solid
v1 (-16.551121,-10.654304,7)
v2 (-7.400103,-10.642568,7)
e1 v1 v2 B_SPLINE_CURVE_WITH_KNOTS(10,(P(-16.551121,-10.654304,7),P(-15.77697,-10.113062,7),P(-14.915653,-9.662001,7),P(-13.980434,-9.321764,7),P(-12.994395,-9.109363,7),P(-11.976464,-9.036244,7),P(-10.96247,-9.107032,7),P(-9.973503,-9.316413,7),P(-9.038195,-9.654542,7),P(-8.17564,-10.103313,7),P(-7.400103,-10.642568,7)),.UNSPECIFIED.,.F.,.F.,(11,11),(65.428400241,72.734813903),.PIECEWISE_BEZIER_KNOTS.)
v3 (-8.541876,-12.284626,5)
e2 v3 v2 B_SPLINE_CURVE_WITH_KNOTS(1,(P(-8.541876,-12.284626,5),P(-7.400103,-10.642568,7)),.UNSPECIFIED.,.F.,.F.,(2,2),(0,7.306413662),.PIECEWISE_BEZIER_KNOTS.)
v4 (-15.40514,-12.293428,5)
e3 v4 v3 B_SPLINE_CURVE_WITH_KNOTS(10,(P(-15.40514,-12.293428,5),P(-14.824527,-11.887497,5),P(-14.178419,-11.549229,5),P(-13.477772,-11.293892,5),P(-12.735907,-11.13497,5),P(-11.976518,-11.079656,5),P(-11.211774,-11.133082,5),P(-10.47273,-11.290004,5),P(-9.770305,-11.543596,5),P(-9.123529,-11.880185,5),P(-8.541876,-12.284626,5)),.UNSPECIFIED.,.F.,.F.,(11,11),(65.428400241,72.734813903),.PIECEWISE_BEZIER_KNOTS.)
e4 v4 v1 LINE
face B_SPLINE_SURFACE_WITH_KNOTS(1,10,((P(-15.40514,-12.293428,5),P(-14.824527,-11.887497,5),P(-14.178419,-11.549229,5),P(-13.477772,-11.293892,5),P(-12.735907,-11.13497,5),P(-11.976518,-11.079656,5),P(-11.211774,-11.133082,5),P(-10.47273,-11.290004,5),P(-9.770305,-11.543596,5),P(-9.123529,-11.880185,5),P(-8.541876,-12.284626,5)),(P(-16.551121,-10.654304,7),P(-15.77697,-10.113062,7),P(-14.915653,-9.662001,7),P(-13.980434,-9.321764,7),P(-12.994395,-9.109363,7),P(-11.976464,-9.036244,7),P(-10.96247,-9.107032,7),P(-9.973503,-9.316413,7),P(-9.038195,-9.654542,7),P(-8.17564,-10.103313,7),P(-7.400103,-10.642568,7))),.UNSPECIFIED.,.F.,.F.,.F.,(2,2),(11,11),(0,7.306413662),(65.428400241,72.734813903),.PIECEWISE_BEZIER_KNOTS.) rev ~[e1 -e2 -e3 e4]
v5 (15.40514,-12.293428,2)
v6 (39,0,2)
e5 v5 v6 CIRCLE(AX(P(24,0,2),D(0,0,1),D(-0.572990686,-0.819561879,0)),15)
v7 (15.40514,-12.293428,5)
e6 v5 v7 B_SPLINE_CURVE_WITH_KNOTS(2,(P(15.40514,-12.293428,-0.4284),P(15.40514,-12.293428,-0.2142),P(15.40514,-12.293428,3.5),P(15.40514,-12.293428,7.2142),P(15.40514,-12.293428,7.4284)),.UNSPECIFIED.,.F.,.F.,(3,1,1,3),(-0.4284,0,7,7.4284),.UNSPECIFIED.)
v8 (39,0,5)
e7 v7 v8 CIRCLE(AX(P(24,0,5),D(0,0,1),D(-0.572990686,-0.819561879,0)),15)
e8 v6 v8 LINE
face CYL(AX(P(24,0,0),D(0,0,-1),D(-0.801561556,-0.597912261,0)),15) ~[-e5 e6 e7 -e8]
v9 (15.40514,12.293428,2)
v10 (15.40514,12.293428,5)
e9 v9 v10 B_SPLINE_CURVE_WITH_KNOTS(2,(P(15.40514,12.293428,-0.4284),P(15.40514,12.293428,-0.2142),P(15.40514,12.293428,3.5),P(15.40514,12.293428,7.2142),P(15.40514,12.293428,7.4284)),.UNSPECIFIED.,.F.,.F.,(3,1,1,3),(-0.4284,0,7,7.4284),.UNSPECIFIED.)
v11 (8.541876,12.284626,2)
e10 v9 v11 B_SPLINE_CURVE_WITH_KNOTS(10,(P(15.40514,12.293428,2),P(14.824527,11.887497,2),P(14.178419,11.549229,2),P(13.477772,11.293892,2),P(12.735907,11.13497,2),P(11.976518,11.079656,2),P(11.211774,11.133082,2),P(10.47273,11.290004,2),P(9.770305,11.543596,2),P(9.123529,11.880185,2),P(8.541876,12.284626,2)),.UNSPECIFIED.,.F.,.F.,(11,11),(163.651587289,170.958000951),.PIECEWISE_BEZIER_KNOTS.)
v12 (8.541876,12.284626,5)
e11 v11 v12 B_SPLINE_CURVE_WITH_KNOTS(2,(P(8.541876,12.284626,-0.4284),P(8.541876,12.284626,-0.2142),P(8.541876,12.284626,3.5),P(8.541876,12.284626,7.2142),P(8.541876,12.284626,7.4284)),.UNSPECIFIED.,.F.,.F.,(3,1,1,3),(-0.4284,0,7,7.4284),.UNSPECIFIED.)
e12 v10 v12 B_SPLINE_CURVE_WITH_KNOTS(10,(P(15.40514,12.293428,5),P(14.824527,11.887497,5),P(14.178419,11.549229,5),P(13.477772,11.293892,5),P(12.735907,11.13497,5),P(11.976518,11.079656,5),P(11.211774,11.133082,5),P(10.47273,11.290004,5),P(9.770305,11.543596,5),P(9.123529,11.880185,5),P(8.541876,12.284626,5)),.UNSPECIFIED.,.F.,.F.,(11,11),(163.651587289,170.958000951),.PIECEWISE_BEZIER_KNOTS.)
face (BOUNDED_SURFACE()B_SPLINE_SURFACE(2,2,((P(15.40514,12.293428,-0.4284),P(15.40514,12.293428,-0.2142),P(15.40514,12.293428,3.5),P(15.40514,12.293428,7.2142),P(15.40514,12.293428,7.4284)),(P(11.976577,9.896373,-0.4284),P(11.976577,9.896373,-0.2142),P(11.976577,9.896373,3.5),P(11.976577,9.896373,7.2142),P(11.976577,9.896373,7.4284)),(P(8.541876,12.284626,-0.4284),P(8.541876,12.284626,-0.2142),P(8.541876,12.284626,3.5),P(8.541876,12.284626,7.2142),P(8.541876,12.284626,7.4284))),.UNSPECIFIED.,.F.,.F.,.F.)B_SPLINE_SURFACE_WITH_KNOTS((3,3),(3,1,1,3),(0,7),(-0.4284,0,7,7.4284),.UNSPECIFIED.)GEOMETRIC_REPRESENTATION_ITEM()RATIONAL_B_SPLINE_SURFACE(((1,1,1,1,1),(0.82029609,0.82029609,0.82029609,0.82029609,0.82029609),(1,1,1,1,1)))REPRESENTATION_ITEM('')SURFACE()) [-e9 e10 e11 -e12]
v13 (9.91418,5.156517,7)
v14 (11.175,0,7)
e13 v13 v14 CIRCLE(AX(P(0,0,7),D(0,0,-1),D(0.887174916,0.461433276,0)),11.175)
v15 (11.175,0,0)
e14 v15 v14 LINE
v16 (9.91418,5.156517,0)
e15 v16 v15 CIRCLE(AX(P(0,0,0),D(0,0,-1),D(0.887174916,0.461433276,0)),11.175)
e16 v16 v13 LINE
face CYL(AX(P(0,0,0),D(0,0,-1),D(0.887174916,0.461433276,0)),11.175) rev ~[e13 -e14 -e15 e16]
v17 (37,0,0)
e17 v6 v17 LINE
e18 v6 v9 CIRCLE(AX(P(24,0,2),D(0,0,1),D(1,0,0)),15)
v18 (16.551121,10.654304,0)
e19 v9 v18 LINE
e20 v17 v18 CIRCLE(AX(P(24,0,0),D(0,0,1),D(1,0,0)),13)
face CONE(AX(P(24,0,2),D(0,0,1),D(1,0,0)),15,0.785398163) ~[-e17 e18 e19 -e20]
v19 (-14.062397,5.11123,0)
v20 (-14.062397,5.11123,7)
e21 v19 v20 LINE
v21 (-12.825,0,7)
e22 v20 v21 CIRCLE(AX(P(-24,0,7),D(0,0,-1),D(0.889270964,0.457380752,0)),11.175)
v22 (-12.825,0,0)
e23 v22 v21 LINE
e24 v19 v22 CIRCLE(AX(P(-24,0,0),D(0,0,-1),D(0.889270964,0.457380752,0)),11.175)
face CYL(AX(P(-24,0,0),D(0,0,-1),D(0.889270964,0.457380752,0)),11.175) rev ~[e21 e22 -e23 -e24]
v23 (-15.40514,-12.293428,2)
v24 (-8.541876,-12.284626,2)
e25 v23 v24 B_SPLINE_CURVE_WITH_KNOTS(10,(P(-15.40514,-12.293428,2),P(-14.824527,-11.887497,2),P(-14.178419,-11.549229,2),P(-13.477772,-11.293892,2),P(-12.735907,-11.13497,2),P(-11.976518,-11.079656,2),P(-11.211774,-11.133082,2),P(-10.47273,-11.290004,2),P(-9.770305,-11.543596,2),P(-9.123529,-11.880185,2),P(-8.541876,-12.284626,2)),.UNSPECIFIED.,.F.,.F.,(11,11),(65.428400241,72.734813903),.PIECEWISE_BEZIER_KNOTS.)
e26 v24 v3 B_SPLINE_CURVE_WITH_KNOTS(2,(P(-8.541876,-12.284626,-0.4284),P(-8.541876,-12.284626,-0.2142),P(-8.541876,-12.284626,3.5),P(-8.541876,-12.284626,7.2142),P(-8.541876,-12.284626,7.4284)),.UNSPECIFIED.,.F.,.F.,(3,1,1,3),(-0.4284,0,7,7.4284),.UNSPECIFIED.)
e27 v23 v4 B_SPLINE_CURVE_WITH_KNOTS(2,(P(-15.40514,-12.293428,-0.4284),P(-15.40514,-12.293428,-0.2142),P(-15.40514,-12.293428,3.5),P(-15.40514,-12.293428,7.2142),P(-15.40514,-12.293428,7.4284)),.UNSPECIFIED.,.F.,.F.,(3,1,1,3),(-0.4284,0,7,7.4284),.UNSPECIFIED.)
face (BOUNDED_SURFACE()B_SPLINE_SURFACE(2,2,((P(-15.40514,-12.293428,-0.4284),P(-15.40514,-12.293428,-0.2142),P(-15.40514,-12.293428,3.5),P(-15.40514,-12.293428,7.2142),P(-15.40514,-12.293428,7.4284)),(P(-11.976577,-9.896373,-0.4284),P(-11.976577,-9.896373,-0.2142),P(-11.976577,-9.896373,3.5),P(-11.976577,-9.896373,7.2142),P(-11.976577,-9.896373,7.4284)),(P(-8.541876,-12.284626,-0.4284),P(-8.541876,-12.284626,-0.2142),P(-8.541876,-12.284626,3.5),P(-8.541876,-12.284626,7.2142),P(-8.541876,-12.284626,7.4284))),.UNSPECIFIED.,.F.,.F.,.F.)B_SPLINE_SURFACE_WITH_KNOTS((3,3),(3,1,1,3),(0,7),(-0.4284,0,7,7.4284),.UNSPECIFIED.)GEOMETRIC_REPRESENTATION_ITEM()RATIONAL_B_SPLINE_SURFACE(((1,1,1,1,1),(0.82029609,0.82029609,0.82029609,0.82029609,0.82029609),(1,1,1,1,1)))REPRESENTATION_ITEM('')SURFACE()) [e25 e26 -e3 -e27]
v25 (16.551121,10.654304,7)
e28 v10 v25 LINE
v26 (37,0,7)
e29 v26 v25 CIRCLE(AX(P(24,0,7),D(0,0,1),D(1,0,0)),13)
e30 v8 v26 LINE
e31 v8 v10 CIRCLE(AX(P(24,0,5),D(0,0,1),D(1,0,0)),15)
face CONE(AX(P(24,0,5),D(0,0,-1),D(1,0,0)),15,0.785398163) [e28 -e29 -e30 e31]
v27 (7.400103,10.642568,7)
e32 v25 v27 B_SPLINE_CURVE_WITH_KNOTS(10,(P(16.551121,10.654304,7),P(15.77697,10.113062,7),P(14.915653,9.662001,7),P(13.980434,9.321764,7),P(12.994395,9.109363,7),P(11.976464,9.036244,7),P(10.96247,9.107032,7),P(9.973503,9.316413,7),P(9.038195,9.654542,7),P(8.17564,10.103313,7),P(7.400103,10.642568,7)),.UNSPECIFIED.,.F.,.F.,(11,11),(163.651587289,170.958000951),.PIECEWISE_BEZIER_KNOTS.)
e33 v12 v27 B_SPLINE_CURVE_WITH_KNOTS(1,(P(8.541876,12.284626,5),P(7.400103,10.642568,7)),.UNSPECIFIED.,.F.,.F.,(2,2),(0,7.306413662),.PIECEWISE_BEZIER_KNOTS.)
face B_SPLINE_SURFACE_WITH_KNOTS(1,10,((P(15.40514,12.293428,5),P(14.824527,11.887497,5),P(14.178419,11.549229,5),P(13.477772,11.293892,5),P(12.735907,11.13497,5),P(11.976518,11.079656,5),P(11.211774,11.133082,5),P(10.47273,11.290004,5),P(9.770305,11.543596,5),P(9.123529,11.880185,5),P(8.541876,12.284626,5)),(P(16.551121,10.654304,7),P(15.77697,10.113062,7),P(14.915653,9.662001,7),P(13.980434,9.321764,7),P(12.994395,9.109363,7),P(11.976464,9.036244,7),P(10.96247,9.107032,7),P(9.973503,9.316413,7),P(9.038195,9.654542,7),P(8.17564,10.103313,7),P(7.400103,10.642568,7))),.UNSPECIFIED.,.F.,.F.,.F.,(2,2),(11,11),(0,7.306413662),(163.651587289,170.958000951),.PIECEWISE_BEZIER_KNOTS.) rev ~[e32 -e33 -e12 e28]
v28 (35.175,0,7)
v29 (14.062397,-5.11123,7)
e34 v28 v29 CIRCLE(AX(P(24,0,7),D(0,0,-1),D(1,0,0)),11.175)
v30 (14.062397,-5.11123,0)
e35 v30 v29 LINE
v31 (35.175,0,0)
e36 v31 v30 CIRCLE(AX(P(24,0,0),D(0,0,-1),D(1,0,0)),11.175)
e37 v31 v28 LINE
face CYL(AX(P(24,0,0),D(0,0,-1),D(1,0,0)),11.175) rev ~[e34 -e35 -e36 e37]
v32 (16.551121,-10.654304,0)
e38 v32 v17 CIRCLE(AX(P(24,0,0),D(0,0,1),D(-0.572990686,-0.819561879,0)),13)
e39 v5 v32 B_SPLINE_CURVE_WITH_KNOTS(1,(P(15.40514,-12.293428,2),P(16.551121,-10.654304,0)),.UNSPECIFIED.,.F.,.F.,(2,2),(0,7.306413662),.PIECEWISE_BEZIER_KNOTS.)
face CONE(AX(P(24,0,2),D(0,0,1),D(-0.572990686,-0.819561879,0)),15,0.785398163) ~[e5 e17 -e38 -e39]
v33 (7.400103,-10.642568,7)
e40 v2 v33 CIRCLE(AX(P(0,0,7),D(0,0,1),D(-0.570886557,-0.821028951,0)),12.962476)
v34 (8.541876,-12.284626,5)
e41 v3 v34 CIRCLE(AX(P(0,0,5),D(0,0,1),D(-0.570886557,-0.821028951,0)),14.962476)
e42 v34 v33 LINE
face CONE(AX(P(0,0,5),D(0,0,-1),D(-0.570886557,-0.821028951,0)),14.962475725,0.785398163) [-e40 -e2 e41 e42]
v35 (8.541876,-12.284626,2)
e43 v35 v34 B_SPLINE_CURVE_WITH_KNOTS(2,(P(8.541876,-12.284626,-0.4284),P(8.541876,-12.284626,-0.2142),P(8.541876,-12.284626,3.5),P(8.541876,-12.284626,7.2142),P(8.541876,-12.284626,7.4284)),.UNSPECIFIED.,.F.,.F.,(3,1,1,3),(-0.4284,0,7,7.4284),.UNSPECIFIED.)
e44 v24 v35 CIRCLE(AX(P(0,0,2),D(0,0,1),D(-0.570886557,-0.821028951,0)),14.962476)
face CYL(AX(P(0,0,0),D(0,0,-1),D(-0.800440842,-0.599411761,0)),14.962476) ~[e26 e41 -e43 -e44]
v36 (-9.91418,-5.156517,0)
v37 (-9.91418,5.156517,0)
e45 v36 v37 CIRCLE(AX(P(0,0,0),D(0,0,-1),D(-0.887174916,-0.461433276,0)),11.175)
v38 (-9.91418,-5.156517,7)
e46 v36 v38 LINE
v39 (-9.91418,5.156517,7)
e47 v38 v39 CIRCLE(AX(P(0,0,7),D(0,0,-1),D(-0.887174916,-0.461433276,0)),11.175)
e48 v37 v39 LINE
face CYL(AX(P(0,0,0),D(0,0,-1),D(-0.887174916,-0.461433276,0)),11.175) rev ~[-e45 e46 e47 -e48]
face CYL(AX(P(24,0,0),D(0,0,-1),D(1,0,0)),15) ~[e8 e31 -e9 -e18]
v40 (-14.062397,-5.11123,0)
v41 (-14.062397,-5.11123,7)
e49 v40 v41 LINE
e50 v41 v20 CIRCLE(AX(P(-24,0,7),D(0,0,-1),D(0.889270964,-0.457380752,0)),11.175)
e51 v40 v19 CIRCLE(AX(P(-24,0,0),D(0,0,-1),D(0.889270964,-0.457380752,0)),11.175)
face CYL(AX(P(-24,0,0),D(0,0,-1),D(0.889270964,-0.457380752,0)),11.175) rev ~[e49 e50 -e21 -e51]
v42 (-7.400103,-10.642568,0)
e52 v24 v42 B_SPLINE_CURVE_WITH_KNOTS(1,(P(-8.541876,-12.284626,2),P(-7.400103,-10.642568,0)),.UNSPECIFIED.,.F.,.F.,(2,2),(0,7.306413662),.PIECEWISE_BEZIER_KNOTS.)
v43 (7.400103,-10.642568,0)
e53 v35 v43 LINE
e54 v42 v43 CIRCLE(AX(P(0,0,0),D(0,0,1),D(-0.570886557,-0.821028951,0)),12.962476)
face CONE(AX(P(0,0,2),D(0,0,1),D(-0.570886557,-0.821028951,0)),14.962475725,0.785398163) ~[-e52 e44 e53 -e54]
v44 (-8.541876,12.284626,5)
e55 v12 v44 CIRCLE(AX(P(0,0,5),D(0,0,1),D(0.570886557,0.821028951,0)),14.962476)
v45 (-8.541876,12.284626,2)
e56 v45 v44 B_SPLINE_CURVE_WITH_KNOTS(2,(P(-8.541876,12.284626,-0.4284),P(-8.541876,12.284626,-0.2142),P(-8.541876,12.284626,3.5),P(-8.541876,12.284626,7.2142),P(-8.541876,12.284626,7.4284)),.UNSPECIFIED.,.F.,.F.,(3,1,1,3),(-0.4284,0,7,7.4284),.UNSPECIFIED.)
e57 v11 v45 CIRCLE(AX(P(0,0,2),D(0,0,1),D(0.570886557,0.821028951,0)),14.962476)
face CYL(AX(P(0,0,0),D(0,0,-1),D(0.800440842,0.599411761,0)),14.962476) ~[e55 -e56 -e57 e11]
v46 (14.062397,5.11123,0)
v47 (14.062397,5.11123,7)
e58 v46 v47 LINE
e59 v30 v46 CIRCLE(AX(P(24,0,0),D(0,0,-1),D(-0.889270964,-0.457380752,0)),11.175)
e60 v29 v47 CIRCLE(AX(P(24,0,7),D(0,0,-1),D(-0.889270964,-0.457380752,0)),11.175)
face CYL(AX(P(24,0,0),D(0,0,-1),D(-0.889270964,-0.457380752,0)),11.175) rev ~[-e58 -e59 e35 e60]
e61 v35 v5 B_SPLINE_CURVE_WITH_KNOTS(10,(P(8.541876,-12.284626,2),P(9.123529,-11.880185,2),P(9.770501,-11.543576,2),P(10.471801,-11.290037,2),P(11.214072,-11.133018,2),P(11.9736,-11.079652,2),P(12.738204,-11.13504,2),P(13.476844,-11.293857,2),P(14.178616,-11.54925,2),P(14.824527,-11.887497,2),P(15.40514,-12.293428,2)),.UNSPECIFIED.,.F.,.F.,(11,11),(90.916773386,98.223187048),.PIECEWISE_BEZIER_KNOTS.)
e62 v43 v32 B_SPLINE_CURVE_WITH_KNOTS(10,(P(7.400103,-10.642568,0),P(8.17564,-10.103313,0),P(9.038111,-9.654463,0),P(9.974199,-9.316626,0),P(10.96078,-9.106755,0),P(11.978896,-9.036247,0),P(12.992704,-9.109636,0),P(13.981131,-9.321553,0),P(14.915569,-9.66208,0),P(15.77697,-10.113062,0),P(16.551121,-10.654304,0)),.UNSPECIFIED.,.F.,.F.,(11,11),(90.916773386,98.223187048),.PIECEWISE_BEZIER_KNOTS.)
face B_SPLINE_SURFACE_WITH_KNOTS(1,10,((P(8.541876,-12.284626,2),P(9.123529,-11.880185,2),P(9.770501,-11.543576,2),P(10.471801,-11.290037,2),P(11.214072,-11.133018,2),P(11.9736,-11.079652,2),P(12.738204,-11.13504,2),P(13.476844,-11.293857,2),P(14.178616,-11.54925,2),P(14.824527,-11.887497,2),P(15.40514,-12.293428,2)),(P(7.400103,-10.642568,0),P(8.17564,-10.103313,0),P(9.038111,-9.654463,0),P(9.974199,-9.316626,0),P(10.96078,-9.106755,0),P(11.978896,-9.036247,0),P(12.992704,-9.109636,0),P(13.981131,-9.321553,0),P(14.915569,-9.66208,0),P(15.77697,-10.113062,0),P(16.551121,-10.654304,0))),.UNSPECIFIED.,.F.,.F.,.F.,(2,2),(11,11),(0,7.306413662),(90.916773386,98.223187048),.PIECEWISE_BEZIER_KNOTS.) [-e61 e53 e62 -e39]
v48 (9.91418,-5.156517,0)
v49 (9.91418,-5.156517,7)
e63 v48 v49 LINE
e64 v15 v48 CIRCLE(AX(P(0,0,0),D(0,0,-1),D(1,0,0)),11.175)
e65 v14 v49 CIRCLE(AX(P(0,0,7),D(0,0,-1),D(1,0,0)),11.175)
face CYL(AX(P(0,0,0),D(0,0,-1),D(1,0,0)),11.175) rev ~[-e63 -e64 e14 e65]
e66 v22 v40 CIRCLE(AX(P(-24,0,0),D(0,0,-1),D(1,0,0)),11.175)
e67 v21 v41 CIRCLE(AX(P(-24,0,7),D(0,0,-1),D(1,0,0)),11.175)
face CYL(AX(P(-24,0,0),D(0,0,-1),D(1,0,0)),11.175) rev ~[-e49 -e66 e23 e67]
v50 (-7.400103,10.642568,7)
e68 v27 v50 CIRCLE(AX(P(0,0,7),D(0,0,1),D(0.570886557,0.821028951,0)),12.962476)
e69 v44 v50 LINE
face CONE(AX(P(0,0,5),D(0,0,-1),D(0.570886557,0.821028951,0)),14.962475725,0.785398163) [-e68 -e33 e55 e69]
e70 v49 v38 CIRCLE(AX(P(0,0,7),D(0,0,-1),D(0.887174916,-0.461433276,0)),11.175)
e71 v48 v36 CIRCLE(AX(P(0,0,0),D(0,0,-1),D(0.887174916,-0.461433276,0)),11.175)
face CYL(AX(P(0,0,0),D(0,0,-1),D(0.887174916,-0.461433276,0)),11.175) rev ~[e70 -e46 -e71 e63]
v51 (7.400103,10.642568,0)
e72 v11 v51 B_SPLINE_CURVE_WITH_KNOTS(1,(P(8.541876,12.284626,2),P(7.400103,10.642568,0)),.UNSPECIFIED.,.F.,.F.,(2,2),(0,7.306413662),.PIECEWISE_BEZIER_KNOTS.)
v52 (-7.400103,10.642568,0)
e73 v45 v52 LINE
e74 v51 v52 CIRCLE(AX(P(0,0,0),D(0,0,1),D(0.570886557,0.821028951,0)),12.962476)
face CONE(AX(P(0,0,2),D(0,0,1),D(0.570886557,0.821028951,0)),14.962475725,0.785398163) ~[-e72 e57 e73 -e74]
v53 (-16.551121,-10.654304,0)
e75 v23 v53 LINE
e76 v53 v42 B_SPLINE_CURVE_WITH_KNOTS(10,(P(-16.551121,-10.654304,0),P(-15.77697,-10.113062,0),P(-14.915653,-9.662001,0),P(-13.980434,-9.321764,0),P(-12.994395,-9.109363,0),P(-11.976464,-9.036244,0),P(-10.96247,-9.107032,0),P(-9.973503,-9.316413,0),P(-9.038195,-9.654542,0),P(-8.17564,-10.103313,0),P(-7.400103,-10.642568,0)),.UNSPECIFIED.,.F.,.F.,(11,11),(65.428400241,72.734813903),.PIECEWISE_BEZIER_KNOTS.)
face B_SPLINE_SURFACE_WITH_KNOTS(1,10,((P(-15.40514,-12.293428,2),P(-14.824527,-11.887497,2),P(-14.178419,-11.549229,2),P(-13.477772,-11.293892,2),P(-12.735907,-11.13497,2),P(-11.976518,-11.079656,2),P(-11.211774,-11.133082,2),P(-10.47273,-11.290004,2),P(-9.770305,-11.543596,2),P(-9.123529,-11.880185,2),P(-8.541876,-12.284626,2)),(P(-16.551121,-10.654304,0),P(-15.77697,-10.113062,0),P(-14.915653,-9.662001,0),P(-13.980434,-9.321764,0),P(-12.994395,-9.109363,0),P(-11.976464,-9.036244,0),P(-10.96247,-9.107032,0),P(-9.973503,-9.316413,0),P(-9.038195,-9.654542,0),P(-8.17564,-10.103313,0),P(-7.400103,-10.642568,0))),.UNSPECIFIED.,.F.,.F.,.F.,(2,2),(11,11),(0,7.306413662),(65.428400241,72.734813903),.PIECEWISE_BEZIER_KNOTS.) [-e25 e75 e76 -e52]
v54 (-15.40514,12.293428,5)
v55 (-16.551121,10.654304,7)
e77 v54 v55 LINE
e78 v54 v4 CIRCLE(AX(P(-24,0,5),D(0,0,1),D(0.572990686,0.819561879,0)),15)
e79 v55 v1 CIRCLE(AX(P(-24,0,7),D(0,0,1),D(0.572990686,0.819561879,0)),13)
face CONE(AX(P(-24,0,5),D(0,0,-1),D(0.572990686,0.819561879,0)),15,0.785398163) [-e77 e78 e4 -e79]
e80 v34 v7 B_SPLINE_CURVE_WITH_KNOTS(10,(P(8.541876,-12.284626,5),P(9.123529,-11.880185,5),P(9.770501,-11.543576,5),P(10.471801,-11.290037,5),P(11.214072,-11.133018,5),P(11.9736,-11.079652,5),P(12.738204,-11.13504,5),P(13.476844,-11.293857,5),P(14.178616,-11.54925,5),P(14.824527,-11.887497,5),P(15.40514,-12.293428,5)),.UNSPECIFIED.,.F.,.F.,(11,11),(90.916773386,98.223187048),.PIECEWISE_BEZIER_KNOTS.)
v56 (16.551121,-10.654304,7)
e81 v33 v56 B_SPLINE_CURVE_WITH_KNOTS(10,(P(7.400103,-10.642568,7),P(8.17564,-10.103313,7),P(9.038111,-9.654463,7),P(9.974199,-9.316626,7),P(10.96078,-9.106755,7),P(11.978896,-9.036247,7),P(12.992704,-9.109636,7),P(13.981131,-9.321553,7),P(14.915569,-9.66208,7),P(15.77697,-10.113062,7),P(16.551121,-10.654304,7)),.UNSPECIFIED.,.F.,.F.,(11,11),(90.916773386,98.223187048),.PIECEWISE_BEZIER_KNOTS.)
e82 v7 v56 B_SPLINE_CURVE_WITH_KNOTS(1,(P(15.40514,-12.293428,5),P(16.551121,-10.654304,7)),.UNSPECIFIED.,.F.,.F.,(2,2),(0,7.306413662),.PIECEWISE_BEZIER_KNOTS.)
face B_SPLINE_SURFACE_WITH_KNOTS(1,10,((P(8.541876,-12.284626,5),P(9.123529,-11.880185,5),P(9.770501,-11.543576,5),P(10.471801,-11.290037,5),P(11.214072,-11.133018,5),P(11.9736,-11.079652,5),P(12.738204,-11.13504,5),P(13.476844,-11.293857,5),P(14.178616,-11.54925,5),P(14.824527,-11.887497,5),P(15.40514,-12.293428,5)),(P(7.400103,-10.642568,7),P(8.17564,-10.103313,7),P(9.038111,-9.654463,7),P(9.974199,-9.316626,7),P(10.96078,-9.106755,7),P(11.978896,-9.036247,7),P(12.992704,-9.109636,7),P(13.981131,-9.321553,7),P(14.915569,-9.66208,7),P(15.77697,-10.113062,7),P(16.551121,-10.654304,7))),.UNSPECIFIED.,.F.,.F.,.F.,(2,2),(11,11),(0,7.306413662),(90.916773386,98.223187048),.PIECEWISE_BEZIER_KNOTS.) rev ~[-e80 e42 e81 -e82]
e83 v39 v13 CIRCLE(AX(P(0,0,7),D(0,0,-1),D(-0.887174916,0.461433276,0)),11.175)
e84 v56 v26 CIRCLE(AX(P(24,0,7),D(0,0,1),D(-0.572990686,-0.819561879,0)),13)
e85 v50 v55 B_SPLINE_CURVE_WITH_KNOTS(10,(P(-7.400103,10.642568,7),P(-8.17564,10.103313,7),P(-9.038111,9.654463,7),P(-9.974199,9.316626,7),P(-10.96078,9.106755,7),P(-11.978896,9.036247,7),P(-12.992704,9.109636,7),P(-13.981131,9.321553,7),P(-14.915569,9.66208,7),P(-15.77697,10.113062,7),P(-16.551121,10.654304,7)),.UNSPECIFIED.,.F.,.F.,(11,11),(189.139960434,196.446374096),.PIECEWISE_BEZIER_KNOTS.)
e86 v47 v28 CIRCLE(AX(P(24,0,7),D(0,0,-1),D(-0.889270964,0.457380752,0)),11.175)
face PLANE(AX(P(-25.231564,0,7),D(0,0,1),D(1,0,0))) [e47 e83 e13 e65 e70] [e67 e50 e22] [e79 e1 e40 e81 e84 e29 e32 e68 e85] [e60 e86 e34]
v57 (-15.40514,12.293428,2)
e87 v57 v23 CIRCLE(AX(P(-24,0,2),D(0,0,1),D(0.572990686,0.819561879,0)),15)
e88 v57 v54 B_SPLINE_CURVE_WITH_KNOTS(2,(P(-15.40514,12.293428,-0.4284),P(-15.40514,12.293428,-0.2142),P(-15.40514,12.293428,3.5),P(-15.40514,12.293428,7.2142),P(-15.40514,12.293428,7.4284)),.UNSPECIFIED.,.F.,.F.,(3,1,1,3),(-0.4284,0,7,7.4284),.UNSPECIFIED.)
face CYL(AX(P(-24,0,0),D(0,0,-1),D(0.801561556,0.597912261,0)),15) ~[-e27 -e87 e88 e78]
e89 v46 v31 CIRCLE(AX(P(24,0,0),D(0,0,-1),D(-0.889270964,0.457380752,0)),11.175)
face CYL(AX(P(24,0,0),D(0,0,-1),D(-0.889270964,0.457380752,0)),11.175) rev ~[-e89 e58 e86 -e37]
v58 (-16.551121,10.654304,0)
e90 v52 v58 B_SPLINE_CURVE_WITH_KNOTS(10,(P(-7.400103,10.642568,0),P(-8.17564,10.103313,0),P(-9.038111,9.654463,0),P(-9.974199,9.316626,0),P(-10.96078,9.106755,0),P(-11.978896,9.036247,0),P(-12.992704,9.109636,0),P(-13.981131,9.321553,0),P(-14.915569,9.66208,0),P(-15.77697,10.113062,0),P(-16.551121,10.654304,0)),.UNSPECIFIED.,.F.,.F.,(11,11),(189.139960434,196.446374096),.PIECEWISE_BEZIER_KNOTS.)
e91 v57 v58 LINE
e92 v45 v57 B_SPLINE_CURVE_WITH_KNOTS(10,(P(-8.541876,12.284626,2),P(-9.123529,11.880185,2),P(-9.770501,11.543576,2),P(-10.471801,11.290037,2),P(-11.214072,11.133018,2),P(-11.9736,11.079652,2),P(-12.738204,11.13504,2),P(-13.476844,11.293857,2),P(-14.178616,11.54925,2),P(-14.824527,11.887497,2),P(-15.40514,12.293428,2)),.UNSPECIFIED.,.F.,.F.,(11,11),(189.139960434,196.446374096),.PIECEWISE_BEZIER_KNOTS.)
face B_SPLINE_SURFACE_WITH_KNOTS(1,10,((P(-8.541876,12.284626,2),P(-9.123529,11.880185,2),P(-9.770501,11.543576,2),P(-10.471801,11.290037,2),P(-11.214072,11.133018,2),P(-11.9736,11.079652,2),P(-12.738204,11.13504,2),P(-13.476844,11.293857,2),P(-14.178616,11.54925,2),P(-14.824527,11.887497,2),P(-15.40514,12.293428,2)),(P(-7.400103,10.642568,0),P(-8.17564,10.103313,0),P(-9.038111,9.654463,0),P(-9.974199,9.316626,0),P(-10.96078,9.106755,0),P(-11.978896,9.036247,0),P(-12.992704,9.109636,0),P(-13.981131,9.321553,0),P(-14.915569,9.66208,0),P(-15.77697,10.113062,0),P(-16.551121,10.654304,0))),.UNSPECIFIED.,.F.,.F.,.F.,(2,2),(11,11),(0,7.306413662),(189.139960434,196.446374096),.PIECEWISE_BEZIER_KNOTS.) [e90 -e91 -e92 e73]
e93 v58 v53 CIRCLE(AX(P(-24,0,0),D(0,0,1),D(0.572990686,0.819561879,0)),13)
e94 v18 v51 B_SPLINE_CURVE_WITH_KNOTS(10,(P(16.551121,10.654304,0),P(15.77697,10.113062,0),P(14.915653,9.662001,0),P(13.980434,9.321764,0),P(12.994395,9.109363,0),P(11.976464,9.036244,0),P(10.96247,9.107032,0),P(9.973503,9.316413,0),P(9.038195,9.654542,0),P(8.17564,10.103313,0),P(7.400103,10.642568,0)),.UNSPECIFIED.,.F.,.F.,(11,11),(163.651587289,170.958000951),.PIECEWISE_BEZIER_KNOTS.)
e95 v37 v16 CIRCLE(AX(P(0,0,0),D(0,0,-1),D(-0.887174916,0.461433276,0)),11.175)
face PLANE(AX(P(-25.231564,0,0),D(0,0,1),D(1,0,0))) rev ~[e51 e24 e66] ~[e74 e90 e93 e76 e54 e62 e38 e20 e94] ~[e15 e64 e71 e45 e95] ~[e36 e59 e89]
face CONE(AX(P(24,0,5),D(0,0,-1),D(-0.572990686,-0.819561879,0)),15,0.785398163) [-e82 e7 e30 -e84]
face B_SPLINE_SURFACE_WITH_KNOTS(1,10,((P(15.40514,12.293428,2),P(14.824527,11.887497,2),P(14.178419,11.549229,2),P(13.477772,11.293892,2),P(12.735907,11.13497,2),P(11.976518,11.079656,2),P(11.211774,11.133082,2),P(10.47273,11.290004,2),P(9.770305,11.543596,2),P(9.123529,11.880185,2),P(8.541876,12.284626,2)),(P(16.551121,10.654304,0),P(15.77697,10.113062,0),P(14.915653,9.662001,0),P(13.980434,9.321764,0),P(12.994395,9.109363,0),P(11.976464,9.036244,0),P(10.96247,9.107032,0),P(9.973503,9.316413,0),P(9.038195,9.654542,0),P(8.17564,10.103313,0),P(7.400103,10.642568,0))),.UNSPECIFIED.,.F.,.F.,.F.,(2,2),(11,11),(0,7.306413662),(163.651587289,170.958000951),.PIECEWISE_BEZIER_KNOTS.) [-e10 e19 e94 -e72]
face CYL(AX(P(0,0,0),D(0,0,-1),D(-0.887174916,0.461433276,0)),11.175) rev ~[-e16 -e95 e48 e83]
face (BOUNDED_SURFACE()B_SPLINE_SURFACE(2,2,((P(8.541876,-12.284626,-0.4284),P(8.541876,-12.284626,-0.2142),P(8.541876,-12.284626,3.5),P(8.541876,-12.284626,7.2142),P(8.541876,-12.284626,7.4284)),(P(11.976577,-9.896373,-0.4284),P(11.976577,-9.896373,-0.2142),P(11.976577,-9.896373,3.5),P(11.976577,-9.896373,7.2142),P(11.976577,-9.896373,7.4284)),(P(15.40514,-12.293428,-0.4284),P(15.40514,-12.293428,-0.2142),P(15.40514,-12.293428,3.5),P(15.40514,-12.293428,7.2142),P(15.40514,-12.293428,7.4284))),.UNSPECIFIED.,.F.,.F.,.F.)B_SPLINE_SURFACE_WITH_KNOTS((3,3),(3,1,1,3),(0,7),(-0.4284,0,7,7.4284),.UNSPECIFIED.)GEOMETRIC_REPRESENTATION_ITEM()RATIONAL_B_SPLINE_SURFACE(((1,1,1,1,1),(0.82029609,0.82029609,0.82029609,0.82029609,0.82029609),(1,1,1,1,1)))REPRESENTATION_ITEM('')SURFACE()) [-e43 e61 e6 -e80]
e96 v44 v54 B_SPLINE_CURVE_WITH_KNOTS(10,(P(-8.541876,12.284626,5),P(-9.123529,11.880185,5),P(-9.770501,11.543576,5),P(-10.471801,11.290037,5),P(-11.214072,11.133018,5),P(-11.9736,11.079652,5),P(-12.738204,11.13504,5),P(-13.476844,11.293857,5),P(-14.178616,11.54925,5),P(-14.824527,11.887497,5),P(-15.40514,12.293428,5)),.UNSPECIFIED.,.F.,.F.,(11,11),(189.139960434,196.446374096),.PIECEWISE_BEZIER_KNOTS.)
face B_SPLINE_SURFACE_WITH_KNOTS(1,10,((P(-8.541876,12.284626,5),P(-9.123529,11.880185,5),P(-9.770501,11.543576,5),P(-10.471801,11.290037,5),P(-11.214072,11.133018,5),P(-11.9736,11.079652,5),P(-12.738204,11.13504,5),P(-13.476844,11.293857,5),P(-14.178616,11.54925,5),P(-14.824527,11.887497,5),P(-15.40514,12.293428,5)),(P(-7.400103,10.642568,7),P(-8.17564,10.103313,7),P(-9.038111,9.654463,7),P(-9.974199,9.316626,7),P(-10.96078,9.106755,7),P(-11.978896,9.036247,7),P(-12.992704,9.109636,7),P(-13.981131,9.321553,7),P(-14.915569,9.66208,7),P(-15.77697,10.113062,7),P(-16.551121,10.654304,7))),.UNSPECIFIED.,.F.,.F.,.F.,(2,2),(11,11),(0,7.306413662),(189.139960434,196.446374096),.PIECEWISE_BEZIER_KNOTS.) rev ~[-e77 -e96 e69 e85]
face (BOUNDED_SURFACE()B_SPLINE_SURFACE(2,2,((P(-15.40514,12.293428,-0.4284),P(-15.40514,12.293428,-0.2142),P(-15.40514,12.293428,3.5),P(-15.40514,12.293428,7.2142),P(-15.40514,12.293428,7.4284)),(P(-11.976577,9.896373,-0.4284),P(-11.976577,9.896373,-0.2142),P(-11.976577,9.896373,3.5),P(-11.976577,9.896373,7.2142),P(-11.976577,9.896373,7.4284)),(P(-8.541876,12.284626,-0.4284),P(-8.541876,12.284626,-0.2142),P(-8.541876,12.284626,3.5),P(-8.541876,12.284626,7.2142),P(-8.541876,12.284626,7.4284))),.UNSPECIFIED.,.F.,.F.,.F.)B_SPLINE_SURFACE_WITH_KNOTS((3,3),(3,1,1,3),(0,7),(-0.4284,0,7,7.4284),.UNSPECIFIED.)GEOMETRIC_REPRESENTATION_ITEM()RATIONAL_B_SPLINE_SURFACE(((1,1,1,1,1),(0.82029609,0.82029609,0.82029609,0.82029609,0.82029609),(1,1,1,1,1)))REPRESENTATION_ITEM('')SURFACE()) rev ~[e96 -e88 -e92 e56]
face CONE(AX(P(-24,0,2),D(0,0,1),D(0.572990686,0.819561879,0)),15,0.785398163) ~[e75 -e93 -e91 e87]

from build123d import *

# Parameters (mm, degrees)
F1_DEPTH = 7
F2_R     = 6
F3_SIZE  = 2


# Not quite as in the source:
# - a feature names something its author has since deleted; it is built from what else it names


with BuildPart() as f1:
    # F0 (on Top) → F1 (new body)
    with BuildSketch(Plane.XY):
        with BuildLine():
            ThreePointArc((-14.0623969756, 5.1112299037), (-13.1615738007, 7.1167868393), (-11.9765766631, 8.9686839202))
            ThreePointArc((-11.9765766631, 8.9686839202), (-39, 0), (-11.9765766631, -8.9686839202))
            ThreePointArc((-11.9765766631, -8.9686839202), (-13.1615738007, -7.1167868393), (-14.0623969756, -5.1112299037))
            ThreePointArc((-14.0623969756, -5.1112299037), (-35.175, 0), (-14.0623969756, 5.1112299037))
        make_face()
        with BuildLine():
            ThreePointArc((-9.9141796875, -5.1565168597), (-11.175, 0), (-9.9141796875, 5.1565168597))
            ThreePointArc((-9.9141796875, 5.1565168597), (-10.8069599633, 7.1374851726), (-11.9765766631, 8.9686839202))
            ThreePointArc((-11.9765766631, 8.9686839202), (-13.1615738007, 7.1167868393), (-14.0623969756, 5.1112299037))
            ThreePointArc((-14.0623969756, 5.1112299037), (-13.1387537824, 2.6294401687), (-12.825, 0))
            ThreePointArc((-12.825, 0), (-13.1387537824, -2.6294401687), (-14.0623969756, -5.1112299037))
            ThreePointArc((-14.0623969756, -5.1112299037), (-13.1615738007, -7.1167868393), (-11.9765766631, -8.9686839202))
            ThreePointArc((-11.9765766631, -8.9686839202), (-10.8069599633, -7.1374851726), (-9.9141796875, -5.1565168597))
        make_face()
        with BuildLine():
            ThreePointArc((-9.9141796875, 5.1565168597), (0, 11.175), (9.9141796875, 5.1565168597))
            ThreePointArc((9.9141796875, 5.1565168597), (10.8069599633, 7.1374851726), (11.9765766631, 8.9686839202))
            ThreePointArc((11.9765766631, 8.9686839202), (0, 14.9624757252), (-11.9765766631, 8.9686839202))
            ThreePointArc((-11.9765766631, 8.9686839202), (-10.8069599633, 7.1374851726), (-9.9141796875, 5.1565168597))
        make_face()
        with BuildLine():
            ThreePointArc((9.9141796875, 5.1565168597), (10.8552195512, 2.6542105222), (11.175, 0))
            ThreePointArc((11.175, 0), (10.8552195512, -2.6542105222), (9.9141796875, -5.1565168597))
            ThreePointArc((9.9141796875, -5.1565168597), (10.8069599633, -7.1374851726), (11.9765766631, -8.9686839202))
            ThreePointArc((11.9765766631, -8.9686839202), (13.1615738007, -7.1167868393), (14.0623969756, -5.1112299037))
            ThreePointArc((14.0623969756, -5.1112299037), (12.825, 0), (14.0623969756, 5.1112299037))
            ThreePointArc((14.0623969756, 5.1112299037), (13.1615738007, 7.1167868393), (11.9765766631, 8.9686839202))
            ThreePointArc((11.9765766631, 8.9686839202), (10.8069599633, 7.1374851726), (9.9141796875, 5.1565168597))
        make_face()
        with BuildLine():
            ThreePointArc((39, 0), (28.724862429, 14.2364207239), (11.9765766631, 8.9686839202))
            ThreePointArc((11.9765766631, 8.9686839202), (13.1615738007, 7.1167868393), (14.0623969756, 5.1112299037))
            ThreePointArc((14.0623969756, 5.1112299037), (26.6294401687, 10.8612462176), (35.175, 0))
            ThreePointArc((35.175, 0), (26.6294401687, -10.8612462176), (14.0623969756, -5.1112299037))
            ThreePointArc((14.0623969756, -5.1112299037), (13.1615738007, -7.1167868393), (11.9765766631, -8.9686839202))
            ThreePointArc((11.9765766631, -8.9686839202), (28.724862429, -14.2364207239), (39, 0))
        make_face()
        with BuildLine():
            ThreePointArc((11.9765766631, -8.9686839202), (10.8069599633, -7.1374851726), (9.9141796875, -5.1565168597))
            ThreePointArc((9.9141796875, -5.1565168597), (0, -11.175), (-9.9141796875, -5.1565168597))
            ThreePointArc((-9.9141796875, -5.1565168597), (-10.8069599633, -7.1374851726), (-11.9765766631, -8.9686839202))
            ThreePointArc((-11.9765766631, -8.9686839202), (0, -14.9624757252), (11.9765766631, -8.9686839202))
        make_face()
    extrude(amount=F1_DEPTH)

    # F2
    f2_edges = [f1.edges().sort_by_distance(p)[0] for p in [
        (-11.976577, -8.968684, 3.5),
        (11.976577, -8.968684, 3.5),
        (11.976577, 8.968684, 3.5),
        (-11.976577, 8.968684, 3.5),
    ]]
    fillet(f2_edges, radius=F2_R)

    # F3
    f3_edges = [f1.edges().sort_by_distance(p)[0] for p in [
        (-39, 0, 0),
        (-39, 0, 7),
    ]]
    chamfer(f3_edges, length=F3_SIZE)


solid = f1.part
